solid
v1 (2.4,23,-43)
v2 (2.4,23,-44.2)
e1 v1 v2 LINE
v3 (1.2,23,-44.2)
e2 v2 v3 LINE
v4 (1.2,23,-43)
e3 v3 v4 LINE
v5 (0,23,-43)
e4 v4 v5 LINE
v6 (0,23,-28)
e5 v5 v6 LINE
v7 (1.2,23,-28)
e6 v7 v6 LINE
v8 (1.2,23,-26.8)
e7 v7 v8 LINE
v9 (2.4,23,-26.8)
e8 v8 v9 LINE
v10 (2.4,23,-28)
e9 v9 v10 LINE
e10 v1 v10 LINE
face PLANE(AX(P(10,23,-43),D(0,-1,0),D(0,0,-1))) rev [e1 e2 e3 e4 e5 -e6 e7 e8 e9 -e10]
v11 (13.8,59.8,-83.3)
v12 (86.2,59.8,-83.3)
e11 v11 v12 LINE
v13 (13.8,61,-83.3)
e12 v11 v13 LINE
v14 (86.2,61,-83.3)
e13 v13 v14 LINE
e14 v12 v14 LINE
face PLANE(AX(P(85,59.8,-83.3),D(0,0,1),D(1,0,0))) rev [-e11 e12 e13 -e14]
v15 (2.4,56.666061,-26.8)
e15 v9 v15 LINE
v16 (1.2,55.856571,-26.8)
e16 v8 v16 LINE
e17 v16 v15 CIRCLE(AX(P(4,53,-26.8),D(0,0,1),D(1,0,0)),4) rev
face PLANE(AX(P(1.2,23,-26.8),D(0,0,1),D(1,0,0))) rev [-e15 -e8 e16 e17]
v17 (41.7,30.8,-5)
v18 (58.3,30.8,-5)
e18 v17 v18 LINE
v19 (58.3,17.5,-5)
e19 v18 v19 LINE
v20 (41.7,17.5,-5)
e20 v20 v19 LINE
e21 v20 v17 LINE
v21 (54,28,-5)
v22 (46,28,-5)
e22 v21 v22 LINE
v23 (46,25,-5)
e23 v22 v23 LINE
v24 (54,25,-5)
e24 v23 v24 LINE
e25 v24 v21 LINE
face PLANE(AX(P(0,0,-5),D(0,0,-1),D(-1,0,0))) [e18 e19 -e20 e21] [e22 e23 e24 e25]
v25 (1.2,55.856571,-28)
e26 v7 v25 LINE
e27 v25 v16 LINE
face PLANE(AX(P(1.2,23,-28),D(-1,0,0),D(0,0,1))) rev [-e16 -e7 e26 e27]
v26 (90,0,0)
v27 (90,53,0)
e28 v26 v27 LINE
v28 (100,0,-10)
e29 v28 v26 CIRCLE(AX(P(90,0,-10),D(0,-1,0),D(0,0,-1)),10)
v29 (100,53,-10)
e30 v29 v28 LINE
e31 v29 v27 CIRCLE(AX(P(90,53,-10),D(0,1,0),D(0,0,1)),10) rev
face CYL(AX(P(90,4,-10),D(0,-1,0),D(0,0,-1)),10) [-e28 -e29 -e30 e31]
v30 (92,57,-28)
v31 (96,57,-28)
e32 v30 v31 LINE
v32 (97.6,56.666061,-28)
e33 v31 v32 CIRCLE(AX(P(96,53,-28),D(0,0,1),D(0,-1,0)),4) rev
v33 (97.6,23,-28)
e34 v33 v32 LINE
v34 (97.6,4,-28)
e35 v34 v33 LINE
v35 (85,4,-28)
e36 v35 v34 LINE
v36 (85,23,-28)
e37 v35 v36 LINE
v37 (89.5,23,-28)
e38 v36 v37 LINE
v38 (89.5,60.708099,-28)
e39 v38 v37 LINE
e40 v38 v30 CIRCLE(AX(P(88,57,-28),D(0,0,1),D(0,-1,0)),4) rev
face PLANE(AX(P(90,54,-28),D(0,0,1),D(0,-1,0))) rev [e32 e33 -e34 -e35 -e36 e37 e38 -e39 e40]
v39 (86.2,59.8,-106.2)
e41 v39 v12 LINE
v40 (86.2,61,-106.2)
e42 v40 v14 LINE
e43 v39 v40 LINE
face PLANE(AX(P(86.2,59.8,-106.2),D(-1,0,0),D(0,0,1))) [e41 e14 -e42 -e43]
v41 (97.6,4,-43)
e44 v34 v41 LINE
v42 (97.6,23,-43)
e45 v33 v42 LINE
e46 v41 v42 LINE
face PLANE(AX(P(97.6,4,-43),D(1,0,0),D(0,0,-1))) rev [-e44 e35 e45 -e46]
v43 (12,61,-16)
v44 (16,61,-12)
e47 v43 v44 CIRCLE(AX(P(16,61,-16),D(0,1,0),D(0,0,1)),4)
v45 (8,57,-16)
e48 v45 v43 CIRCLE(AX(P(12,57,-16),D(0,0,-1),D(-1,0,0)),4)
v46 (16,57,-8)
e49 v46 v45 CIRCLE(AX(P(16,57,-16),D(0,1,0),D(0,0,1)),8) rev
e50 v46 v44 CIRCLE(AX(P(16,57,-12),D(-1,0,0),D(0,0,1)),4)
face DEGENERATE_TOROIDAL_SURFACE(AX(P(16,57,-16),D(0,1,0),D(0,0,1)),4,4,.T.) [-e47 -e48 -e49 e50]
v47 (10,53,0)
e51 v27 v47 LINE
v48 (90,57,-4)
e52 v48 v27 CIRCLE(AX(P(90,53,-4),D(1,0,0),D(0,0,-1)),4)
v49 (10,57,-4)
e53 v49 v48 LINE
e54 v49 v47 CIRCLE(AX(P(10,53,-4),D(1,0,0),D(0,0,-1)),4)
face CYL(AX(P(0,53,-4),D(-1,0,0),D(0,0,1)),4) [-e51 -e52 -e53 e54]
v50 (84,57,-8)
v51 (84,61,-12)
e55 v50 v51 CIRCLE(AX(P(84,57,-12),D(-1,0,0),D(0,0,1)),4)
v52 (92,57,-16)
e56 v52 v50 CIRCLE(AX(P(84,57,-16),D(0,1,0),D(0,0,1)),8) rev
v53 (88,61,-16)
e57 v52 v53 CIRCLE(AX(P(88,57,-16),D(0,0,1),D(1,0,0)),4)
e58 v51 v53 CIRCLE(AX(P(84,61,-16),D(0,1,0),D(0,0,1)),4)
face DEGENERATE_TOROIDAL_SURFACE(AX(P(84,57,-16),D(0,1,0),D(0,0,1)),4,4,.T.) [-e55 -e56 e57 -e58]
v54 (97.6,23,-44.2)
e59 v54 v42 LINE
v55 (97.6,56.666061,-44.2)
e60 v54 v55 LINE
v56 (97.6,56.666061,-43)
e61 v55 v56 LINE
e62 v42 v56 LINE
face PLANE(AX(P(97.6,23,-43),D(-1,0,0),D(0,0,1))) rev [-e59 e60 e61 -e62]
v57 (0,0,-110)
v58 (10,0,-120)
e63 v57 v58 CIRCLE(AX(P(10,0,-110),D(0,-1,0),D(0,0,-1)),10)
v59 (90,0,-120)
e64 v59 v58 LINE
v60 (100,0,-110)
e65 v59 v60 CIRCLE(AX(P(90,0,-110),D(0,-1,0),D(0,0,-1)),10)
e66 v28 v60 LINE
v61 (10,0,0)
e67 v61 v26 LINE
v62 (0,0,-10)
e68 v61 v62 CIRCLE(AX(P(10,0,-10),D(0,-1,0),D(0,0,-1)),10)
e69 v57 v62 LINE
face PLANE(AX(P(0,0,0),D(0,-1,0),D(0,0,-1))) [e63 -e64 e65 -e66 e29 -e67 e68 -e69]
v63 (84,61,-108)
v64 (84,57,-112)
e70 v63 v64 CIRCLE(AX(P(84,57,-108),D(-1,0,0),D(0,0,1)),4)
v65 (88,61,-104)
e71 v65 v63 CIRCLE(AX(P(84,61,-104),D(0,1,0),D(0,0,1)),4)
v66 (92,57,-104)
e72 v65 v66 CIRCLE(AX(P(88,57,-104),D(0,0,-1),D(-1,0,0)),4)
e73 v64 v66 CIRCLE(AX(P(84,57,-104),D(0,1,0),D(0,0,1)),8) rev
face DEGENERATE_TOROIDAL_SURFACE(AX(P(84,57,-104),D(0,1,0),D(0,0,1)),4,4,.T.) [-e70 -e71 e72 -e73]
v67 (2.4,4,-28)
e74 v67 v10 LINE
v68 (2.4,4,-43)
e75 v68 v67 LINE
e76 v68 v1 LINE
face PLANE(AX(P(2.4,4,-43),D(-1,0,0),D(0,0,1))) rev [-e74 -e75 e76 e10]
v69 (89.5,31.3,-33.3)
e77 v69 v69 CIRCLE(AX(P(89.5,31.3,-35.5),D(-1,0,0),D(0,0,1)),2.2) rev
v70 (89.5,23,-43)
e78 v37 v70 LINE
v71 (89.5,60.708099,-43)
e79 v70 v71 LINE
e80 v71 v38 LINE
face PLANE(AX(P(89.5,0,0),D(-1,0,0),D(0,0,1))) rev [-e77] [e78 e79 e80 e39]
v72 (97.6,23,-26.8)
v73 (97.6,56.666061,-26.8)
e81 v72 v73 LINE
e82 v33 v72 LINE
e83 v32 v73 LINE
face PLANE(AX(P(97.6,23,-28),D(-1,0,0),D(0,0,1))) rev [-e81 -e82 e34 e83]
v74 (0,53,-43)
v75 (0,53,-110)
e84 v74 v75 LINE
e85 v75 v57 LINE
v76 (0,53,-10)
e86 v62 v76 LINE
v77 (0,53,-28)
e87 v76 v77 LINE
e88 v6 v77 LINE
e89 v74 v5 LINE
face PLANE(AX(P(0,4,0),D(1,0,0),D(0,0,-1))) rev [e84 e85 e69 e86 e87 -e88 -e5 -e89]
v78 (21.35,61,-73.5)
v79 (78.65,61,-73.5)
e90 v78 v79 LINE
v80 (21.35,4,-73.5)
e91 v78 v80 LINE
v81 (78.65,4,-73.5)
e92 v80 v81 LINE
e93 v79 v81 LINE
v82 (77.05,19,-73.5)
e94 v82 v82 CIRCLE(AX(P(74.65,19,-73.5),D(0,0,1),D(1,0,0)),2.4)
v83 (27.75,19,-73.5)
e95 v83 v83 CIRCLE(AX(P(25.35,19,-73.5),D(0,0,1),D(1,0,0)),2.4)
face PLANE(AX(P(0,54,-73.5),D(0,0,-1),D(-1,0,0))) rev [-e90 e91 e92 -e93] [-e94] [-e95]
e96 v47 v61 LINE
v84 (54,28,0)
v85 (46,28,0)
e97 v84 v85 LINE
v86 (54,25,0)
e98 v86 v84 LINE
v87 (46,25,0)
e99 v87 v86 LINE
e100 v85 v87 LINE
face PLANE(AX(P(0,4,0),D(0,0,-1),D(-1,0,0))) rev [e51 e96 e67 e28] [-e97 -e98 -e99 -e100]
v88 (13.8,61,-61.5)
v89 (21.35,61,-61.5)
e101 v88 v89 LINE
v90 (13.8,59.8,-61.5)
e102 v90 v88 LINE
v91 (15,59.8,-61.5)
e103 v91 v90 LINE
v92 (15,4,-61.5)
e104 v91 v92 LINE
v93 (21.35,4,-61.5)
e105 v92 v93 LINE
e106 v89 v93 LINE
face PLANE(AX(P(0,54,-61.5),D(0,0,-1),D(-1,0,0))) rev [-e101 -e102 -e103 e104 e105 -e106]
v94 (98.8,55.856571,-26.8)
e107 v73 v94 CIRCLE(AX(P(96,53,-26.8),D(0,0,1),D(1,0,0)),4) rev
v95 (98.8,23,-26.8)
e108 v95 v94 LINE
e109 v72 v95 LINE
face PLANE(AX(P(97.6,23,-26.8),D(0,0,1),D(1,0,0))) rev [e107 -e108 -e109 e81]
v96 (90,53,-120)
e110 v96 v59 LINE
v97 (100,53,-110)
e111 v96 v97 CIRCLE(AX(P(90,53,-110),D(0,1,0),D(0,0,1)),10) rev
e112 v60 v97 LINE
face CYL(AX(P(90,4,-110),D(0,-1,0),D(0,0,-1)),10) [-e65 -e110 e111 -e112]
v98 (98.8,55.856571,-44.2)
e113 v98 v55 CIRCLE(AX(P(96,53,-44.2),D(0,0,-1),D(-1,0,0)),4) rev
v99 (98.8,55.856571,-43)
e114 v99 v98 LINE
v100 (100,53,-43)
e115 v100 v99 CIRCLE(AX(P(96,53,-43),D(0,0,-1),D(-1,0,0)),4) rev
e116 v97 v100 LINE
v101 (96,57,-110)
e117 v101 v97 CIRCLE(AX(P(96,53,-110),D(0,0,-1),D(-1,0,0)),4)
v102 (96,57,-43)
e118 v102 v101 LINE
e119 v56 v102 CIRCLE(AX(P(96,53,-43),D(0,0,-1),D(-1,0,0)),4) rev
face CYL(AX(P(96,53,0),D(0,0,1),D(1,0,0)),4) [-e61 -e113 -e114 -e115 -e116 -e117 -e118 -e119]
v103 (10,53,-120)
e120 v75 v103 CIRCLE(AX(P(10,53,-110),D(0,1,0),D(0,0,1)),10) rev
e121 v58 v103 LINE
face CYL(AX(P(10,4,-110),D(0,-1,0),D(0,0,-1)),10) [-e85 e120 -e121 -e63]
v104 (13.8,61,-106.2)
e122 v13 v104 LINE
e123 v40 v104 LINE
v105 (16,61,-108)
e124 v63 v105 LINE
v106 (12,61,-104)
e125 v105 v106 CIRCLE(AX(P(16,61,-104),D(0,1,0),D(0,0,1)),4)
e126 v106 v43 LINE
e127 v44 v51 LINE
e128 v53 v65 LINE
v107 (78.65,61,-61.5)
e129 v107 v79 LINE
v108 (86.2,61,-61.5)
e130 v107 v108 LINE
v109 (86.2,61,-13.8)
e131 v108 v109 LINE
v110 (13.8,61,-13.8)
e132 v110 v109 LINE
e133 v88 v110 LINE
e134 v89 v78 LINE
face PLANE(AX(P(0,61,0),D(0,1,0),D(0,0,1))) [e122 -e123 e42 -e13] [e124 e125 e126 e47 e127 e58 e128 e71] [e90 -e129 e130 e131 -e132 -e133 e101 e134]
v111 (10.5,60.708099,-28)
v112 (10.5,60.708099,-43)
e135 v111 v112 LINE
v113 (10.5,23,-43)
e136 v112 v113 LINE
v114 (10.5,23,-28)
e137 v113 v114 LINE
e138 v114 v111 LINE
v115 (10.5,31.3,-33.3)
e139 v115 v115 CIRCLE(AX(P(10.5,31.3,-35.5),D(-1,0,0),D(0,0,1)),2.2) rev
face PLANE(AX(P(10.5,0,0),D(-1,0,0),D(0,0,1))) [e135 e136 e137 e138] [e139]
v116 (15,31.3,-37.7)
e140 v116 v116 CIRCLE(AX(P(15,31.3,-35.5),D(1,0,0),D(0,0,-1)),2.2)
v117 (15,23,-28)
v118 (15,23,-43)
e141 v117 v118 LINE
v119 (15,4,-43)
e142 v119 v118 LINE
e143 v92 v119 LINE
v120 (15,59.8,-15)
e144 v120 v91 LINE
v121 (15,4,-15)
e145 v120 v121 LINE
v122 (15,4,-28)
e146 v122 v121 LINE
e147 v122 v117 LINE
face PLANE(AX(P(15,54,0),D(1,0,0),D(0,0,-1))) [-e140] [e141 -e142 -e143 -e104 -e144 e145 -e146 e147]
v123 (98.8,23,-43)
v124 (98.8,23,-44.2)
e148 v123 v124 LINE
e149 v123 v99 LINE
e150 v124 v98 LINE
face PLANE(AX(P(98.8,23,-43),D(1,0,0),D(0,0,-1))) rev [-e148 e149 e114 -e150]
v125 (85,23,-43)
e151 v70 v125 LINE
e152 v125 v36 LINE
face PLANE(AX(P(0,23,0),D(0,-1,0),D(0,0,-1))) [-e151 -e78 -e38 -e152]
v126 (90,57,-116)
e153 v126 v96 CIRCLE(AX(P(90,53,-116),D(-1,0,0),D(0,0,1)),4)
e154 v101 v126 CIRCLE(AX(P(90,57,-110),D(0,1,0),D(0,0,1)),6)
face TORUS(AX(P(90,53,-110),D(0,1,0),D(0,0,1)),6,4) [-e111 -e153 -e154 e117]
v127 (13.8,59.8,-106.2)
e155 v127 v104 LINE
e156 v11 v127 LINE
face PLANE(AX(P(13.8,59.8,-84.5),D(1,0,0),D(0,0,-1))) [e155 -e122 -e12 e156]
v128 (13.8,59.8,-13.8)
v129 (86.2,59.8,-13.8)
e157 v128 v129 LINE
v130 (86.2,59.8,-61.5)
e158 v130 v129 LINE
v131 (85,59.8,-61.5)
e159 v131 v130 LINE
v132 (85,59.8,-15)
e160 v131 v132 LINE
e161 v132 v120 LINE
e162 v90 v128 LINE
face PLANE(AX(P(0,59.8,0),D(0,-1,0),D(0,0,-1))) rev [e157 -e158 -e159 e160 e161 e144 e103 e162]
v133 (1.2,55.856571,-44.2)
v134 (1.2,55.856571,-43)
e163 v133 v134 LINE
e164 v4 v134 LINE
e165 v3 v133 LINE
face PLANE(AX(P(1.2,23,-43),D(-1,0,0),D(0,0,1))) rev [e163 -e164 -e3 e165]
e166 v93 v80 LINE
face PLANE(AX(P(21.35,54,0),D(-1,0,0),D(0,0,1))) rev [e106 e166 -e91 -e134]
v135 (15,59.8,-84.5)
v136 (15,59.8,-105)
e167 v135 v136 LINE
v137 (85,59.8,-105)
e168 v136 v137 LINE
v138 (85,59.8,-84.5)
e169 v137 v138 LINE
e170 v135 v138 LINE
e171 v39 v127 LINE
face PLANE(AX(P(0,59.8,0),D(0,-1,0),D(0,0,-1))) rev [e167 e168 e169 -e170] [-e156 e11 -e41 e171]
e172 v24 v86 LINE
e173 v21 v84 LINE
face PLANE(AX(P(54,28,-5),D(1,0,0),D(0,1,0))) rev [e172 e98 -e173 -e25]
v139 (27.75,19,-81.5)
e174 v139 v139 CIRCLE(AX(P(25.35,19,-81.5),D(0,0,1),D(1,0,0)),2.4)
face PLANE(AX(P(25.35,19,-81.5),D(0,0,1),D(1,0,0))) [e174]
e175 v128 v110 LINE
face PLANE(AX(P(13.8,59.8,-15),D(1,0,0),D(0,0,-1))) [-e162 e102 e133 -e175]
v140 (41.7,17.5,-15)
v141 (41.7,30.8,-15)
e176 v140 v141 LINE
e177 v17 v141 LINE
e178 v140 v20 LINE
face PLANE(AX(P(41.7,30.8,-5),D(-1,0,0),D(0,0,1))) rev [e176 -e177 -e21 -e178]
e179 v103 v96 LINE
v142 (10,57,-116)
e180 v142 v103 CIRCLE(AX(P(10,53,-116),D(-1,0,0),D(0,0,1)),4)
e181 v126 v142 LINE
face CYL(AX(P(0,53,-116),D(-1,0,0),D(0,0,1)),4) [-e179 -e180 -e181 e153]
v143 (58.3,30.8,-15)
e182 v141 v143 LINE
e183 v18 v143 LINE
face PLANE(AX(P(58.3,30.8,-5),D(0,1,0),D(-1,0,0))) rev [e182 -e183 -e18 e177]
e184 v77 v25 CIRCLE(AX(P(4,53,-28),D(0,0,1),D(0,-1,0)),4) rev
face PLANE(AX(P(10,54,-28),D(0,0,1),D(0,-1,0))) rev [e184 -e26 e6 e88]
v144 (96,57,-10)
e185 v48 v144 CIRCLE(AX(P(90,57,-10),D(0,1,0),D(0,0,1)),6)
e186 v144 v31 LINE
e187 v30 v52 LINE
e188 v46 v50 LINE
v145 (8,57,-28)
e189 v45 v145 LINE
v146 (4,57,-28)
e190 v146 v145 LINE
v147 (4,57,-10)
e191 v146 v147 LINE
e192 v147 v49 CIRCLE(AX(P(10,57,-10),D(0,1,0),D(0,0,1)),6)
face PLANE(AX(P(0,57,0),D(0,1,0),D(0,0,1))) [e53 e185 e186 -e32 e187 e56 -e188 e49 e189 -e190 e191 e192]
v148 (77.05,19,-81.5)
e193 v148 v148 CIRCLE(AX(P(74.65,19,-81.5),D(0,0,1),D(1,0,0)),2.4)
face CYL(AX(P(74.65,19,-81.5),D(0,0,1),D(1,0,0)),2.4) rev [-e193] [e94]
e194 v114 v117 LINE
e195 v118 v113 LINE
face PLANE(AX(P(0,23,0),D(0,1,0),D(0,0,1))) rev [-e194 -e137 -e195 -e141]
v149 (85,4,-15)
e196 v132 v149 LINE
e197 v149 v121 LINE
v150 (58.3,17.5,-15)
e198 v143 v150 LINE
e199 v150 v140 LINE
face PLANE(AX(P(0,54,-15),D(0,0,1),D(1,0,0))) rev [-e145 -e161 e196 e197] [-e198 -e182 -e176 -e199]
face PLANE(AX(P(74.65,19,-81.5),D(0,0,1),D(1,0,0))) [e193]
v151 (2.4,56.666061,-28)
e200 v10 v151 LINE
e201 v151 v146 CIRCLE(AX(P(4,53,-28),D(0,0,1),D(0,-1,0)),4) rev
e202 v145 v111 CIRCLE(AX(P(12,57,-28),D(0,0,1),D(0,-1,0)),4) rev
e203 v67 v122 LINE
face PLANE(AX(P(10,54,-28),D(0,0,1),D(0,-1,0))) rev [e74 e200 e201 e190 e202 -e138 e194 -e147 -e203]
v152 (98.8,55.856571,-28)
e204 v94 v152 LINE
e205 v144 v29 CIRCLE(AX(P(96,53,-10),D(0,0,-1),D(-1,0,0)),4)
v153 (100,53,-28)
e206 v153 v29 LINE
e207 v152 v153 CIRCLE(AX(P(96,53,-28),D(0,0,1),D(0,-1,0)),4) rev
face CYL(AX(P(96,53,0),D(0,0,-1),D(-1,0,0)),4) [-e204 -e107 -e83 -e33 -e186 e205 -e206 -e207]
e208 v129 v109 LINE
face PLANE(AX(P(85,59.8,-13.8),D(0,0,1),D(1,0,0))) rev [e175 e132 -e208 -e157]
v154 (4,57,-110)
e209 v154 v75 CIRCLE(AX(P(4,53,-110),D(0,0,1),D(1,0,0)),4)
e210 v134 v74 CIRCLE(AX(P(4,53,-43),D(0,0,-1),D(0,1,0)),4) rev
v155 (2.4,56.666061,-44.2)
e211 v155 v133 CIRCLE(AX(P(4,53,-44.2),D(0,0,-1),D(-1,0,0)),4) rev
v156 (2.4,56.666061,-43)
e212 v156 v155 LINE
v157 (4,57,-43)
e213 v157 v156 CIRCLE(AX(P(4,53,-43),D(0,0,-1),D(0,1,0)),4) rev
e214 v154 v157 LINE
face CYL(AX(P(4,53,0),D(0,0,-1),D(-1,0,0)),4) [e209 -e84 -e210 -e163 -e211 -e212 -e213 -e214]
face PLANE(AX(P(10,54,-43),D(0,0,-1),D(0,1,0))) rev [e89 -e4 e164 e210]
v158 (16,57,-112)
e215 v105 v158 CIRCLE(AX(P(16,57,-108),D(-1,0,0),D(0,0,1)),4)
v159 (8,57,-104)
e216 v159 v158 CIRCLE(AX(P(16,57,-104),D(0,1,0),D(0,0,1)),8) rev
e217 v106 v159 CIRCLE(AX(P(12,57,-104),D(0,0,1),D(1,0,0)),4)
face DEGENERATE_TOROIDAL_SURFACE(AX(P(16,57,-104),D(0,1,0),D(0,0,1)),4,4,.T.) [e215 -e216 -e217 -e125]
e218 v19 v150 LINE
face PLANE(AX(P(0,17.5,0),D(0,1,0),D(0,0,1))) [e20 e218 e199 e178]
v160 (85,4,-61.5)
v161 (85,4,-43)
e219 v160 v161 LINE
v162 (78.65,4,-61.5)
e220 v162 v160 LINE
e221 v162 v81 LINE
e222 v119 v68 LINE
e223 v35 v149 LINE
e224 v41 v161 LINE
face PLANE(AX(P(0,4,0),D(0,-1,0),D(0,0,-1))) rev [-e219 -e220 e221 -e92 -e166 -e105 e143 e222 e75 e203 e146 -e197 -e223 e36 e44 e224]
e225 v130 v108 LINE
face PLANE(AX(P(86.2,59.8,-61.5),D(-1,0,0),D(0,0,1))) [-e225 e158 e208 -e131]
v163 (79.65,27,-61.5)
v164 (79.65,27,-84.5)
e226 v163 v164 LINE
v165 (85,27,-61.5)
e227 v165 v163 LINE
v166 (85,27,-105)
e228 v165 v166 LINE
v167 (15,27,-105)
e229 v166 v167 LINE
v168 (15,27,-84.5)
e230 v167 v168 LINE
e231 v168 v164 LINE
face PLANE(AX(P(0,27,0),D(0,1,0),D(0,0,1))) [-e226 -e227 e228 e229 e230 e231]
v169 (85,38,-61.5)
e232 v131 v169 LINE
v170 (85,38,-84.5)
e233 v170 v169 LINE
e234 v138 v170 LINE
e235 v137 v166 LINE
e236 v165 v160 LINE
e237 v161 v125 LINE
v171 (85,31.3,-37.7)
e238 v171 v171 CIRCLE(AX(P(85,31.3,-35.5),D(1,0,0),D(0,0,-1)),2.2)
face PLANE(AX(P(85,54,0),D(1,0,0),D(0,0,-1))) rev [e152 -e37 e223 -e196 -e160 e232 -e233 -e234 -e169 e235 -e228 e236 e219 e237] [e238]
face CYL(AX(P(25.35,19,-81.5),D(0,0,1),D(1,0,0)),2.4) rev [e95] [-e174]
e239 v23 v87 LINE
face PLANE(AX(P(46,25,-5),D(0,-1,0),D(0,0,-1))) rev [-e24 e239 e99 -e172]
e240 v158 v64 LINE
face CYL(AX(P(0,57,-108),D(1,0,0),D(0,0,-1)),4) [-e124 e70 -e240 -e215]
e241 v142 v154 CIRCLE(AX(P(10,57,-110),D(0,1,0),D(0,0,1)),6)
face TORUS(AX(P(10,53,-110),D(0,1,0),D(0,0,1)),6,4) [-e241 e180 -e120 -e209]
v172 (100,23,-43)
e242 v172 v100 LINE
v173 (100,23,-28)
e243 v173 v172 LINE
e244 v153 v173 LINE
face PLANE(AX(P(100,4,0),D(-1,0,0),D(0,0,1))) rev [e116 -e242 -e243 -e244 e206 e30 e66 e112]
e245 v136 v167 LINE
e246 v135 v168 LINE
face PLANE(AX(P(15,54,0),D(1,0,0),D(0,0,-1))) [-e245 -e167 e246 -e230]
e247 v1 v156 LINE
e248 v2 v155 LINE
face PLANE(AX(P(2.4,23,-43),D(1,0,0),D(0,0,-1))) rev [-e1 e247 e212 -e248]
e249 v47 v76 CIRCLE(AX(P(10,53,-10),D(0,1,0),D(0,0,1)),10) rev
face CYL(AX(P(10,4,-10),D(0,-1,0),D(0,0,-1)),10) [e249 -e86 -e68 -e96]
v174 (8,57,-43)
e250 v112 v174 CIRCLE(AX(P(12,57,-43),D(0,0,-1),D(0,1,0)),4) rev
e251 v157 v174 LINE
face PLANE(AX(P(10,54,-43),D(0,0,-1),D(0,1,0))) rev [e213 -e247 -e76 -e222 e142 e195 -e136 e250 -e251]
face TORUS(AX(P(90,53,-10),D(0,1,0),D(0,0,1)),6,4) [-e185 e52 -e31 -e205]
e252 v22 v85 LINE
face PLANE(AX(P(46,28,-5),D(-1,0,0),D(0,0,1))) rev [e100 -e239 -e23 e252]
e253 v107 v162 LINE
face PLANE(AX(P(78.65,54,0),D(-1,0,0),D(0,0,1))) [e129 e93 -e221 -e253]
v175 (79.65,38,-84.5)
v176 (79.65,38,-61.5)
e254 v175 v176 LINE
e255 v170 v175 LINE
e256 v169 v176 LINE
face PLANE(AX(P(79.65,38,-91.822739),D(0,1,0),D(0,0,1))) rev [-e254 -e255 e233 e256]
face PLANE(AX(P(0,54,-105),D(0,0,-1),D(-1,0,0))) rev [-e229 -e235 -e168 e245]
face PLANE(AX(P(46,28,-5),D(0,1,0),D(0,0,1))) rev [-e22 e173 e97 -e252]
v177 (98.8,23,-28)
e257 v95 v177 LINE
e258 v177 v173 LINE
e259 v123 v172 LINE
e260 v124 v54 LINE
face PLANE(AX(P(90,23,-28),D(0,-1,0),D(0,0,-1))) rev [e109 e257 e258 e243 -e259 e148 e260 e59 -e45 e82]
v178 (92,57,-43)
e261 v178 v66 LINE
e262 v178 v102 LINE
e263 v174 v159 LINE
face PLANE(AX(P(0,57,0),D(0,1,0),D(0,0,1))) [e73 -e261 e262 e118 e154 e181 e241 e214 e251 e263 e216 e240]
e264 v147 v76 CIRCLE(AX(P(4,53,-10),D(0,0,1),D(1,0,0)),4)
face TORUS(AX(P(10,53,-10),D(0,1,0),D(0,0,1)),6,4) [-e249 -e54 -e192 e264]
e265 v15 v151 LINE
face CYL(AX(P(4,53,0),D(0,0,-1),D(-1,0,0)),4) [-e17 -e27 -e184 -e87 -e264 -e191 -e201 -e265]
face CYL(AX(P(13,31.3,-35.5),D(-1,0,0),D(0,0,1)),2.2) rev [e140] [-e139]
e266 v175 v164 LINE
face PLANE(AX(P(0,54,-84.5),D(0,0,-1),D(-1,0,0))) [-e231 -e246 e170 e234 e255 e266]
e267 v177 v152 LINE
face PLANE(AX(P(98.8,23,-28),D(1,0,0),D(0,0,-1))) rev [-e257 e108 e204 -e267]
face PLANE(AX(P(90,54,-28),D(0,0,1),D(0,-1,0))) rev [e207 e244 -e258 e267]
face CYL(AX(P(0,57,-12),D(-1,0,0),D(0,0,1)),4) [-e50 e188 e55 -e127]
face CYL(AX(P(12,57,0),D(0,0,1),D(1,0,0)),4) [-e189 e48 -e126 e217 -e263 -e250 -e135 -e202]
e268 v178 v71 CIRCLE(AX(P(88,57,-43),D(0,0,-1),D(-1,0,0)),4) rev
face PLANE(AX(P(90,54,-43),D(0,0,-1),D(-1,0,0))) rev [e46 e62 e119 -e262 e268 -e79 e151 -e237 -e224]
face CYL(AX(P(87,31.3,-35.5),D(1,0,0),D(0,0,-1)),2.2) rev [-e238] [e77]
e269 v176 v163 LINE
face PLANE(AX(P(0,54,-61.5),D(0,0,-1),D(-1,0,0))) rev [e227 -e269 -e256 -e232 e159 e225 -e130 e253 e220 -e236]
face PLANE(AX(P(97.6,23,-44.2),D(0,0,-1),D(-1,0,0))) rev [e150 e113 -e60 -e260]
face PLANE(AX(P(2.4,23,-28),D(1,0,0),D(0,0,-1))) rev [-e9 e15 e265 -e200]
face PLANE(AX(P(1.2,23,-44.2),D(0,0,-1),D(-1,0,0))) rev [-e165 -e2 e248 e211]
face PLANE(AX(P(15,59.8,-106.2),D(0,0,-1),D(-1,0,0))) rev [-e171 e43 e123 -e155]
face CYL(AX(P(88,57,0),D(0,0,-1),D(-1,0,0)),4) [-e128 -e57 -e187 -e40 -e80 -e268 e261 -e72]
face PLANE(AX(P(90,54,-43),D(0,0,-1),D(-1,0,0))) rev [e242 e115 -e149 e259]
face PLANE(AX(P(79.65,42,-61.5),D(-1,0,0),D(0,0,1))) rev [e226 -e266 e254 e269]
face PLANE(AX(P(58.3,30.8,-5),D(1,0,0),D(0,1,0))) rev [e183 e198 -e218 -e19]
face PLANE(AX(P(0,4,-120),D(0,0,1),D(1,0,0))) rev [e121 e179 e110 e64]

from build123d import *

# Parameters (mm, degrees)
SKICA2_W                  = 100
SKICA2_H                  = 120
P_IDAT_VYSUNUT_M1_DEPTH   = 4
SKICA3_W                  = 15
SKICA3_H                  = 15
SKICA3_W_2                = 70
SKICA3_W_3                = 57.3
SKICA3_H_2                = 3
P_IDAT_VYSUNUT_M2_DEPTH   = 50
SKICA4_W                  = 70
SKICA4_H                  = 20.5
P_IDAT_VYSUNUT_M3_DEPTH   = 23
SKICA8_W                  = 6.35
SKICA8_H                  = 6
ODEBRAT_VYSUNUT_M1_DEPTH  = 23
SKICA9_W                  = 6.35
SKICA9_H                  = 2
P_IDAT_VYSUNUT_M5_DEPTH   = 6
SKICA10_R                 = 2.4
ODEBRAT_VYSUNUT_M2_DEPTH  = 8
SKICA11_W                 = 16.6
SKICA11_H                 = 11.8
ODEBRAT_VYSUNUT_M5_DEPTH  = 10
SKICA14_W                 = 8
SKICA14_H                 = 3
ODEBRAT_VYSUNUT_M6_DEPTH  = 5
SKICA15_W                 = 100
SKICA15_H                 = 120
SKICA15_W_2               = 84
SKICA15_H_2               = 104
ODEBRAT_VYSUNUT_M7_DEPTH  = 4
SKICA20_W                 = 15
SKICA20_H                 = 31
ODEBRAT_VYSUNUT_M8_DEPTH  = 10
SKICA21_W                 = 15
SKICA21_H                 = 31
ODEBRAT_VYSUNUT_M10_DEPTH = 10
SKICA22_R                 = 2.2
ODEBRAT_VYSUNUT_M11_DEPTH = 3
ODEBRAT_START             = -3
SKICA23_R                 = 2.2
ODEBRAT_VYSUNUT_M12_DEPTH = 3
SKICA24_W                 = 1.2
SKICA24_H                 = 1.2
ODEBRAT_VYSUNUT_M14_DEPTH = 27
SKICA26_W                 = 12.6
SKICA26_H                 = 15
ODEBRAT_VYSUNUT_M16_DEPTH = 19
SKICA32_R                 = 2.2
ODEBRAT_VYSUNUT_M19_DEPTH = 158.749801902
SKICA33_W                 = 2
SKICA33_H                 = 6
ODEBRAT_VYSUNUT_M20_DEPTH = 6.35
SKICA35_W                 = 16.6
SKICA35_H                 = 10
ODEBRAT_VYSUNUT_M21_DEPTH = 1.5
SKICA38_W                 = 1
SKICA38_H                 = 23
P_IDAT_VYSUNUT_M9_DEPTH   = 15
SKICA39_W                 = 5.35
SKICA39_H                 = 5
ODEBRAT_VYSUNUT_M23_DEPTH = 23
SKICA40_W                 = 15
SKICA40_H                 = 31
ODEBRAT_VYSUNUT_M24_DEPTH = 0.5
SKICA41_W                 = 15
SKICA41_H                 = 31
ODEBRAT_VYSUNUT_M25_DEPTH = 0.5
SKICA43_W                 = 70
SKICA43_H                 = 20.5
P_IDAT_VYSUNUT_M10_DEPTH  = 7
P_IDAT_VYSUNUT_M11_DEPTH  = 7
SKICA45_W                 = 70
SKICA45_H                 = 1.2
SKICA45_H_2               = 20.5
SKICA45_W_2               = 1.2
SKICA45_H_3               = 46.5
ODEBRAT_VYSUNUT_M26_DEPTH = 1.2
ZAOBLIT1_R                = 10
ZAOBLIT2_R                = 8
ZAOBLIT3_R                = 4


with BuildPart() as part:
    # Skica2 → Přidat vysunutím1 (new body)
    with BuildSketch(Plane(origin=(0, 0, 0), x_dir=(1, 0, 0), z_dir=(0, 1, 0))):
        with Locations((50, 60)):
            Rectangle(SKICA2_W, SKICA2_H)
    extrude(amount=P_IDAT_VYSUNUT_M1_DEPTH)

    # Skica3 → Přidat vysunutím2 (add)
    with BuildSketch(Plane(origin=(0, 4, 0), x_dir=(1, 0, 0), z_dir=(0, 1, 0))):
        with Locations((7.5, 112.5)):
            Rectangle(SKICA3_W, SKICA3_H)
        with Locations((50, 112.5)):
            Rectangle(SKICA3_W_2, SKICA3_H)
        Polygon((15, 105), (0, 105), (0, 15), (15, 15), (15, 61.5), (15, 76.5), (15, 84.5), align=None)
        with Locations((92.5, 112.5)):
            Rectangle(SKICA3_W, SKICA3_H)
        Polygon((100, 105), (85, 105), (85, 84.5), (85, 76.5), (85, 61.5), (85, 15), (100, 15), align=None)
        Polygon((85, 84.5), (15, 84.5), (15, 76.5), (21.35, 76.5), (78.65, 76.5), (85, 76.5), align=None)
        with Locations((7.5, 7.5)):
            Rectangle(SKICA3_W, SKICA3_H)
        with Locations((50, 7.5)):
            Rectangle(SKICA3_W_2, SKICA3_H)
        with Locations((92.5, 7.5)):
            Rectangle(SKICA3_W, SKICA3_H)
        Polygon((21.35, 76.5), (15, 76.5), (15, 61.5), (21.35, 61.5), (21.35, 73.5), align=None)
        with Locations((50, 75)):
            Rectangle(SKICA3_W_3, SKICA3_H_2)
        Polygon((85, 61.5), (85, 76.5), (78.65, 76.5), (78.65, 73.5), (78.65, 61.5), align=None)
    extrude(amount=P_IDAT_VYSUNUT_M2_DEPTH)

    # Skica4 → Přidat vysunutím3 (add)
    with BuildSketch(Plane(origin=(0, 4, 0), x_dir=(1, 0, 0), z_dir=(0, 1, 0))):
        with Locations((50, 94.75)):
            Rectangle(SKICA4_W, SKICA4_H)
    extrude(amount=P_IDAT_VYSUNUT_M3_DEPTH)

    # Skica8 → Odebrat vysunutím1 (cut)
    with BuildSketch(Plane.XY.offset(-61.5)):
        with Locations((81.825, 30)):
            Rectangle(SKICA8_W, SKICA8_H)
    extrude(amount=-ODEBRAT_VYSUNUT_M1_DEPTH, mode=Mode.SUBTRACT)

    # Skica9 → Přidat vysunutím5 (add)
    with BuildSketch(Plane(origin=(0, 27, 0), x_dir=(1, 0, 0), z_dir=(0, 1, 0))):
        with Locations((81.825, 62.5)):
            Rectangle(SKICA9_W, SKICA9_H)
    extrude(amount=P_IDAT_VYSUNUT_M5_DEPTH)

    # Skica10 → Odebrat vysunutím2 (cut)
    with BuildSketch(Plane.XY.offset(-73.5)):
        with Locations((25.35, 19)):
            Circle(SKICA10_R)
        with Locations((74.65, 19)):
            Circle(SKICA10_R)
    extrude(amount=-ODEBRAT_VYSUNUT_M2_DEPTH, mode=Mode.SUBTRACT)

    # Skica11 → Odebrat vysunutím5 (cut)
    with BuildSketch(Plane(origin=(0, 0, -15), x_dir=(-1, 0, 0), z_dir=(0, 0, -1))):
        with Locations((-50, 24.9)):
            Rectangle(SKICA11_W, SKICA11_H)
    extrude(amount=-ODEBRAT_VYSUNUT_M5_DEPTH, mode=Mode.SUBTRACT)

    # Skica14 → Odebrat vysunutím6 (cut)
    with BuildSketch(Plane.XY):
        with Locations((50, 26.5)):
            Rectangle(SKICA14_W, SKICA14_H)
    extrude(amount=-ODEBRAT_VYSUNUT_M6_DEPTH, mode=Mode.SUBTRACT)

    # Skica15 → Odebrat vysunutím7 (cut)
    with BuildSketch(Plane(origin=(0, 54, 0), x_dir=(1, 0, 0), z_dir=(0, 1, 0))):
        with Locations((50, 60)):
            Rectangle(SKICA15_W, SKICA15_H)
        with Locations((50, 60)):
            Rectangle(SKICA15_W_2, SKICA15_H_2, mode=Mode.SUBTRACT)
    extrude(amount=-ODEBRAT_VYSUNUT_M7_DEPTH, mode=Mode.SUBTRACT)

    # Skica20 → Odebrat vysunutím8 (cut)
    with BuildSketch(Plane.ZY):
        with Locations((-35.5, 38.5)):
            Rectangle(SKICA20_W, SKICA20_H)
    extrude(amount=-ODEBRAT_VYSUNUT_M8_DEPTH, mode=Mode.SUBTRACT)

    # Skica21 → Odebrat vysunutím10 (cut)
    with BuildSketch(Plane(origin=(100, 0, 0), x_dir=(0, 0, -1), z_dir=(1, 0, 0))):
        with Locations((35.5, 38.5)):
            Rectangle(SKICA21_W, SKICA21_H)
    extrude(amount=-ODEBRAT_VYSUNUT_M10_DEPTH, mode=Mode.SUBTRACT)

    # Skica22 → Odebrat vysunutím11 (cut)
    with BuildSketch(Plane.ZY.offset(-10)):
        with Locations((-35.5, 31.3)):
            Circle(SKICA22_R)
    extrude(amount=-ODEBRAT_VYSUNUT_M11_DEPTH, mode=Mode.SUBTRACT)

    # Skica23 → Odebrat vysunutím12 (cut)
    with BuildSketch(Plane(origin=(90, 0, 0), x_dir=(0, 0, -1), z_dir=(1, 0, 0)).offset(ODEBRAT_START)):
        with Locations(Location((35.5, 31.3, 0), (0, 0, 180))):
            Circle(SKICA23_R)
    extrude(amount=ODEBRAT_VYSUNUT_M12_DEPTH, mode=Mode.SUBTRACT)

    # Skica24 → Odebrat vysunutím14 (cut)
    with BuildSketch(Plane(origin=(0, 50, 0), x_dir=(1, 0, 0), z_dir=(0, 1, 0))):
        with Locations((1.8, 27.4)):
            Rectangle(SKICA24_W, SKICA24_H)
        with Locations((1.8, 43.6)):
            Rectangle(SKICA24_W, SKICA24_H)
        with Locations((98.2, 27.4)):
            Rectangle(SKICA24_W, SKICA24_H)
        with Locations((98.2, 43.6)):
            Rectangle(SKICA24_W, SKICA24_H)
    extrude(amount=-ODEBRAT_VYSUNUT_M14_DEPTH, mode=Mode.SUBTRACT)

    # Skica26 → Odebrat vysunutím16 (cut)
    with BuildSketch(Plane(origin=(0, 23, 0), x_dir=(1, 0, 0), z_dir=(0, 1, 0))):
        with Locations((8.7, 35.5)):
            Rectangle(SKICA26_W, SKICA26_H)
        with Locations((91.3, 35.5)):
            Rectangle(SKICA26_W, SKICA26_H)
    extrude(amount=-ODEBRAT_VYSUNUT_M16_DEPTH, mode=Mode.SUBTRACT)

    # Skica32 → Odebrat vysunutím19 (cut, through all)
    with BuildSketch(Plane.ZY.offset(-13)):
        with Locations((-35.5, 31.3)):
            Circle(SKICA32_R)
    extrude(amount=-ODEBRAT_VYSUNUT_M19_DEPTH, mode=Mode.SUBTRACT)

    # Skica33 → Odebrat vysunutím20 (cut)
    with BuildSketch(Plane.ZY.offset(-78.65)):
        with Locations((-62.5, 30)):
            Rectangle(SKICA33_W, SKICA33_H)
    extrude(amount=-ODEBRAT_VYSUNUT_M20_DEPTH, mode=Mode.SUBTRACT)

    # Skica35 → Odebrat vysunutím21 (cut)
    with BuildSketch(Plane(origin=(0, 19, 0), x_dir=(1, 0, 0), z_dir=(0, 1, 0))):
        with Locations((50, 10)):
            Rectangle(SKICA35_W, SKICA35_H)
    extrude(amount=-ODEBRAT_VYSUNUT_M21_DEPTH, mode=Mode.SUBTRACT)

    # Skica38 → Přidat vysunutím9 (add)
    with BuildSketch(Plane(origin=(0, 27, 0), x_dir=(1, 0, 0), z_dir=(0, 1, 0))):
        with Locations((79.15, 73)):
            Rectangle(SKICA38_W, SKICA38_H)
    extrude(amount=P_IDAT_VYSUNUT_M9_DEPTH)

    # Skica39 → Odebrat vysunutím23 (cut)
    with BuildSketch(Plane.XY.offset(-61.5)):
        with Locations((82.325, 35.5)):
            Rectangle(SKICA39_W, SKICA39_H)
    extrude(amount=-ODEBRAT_VYSUNUT_M23_DEPTH, mode=Mode.SUBTRACT)

    # Skica40 → Odebrat vysunutím24 (cut)
    with BuildSketch(Plane.ZY.offset(-10)):
        with Locations((-35.5, 38.5)):
            Rectangle(SKICA40_W, SKICA40_H)
    extrude(amount=-ODEBRAT_VYSUNUT_M24_DEPTH, mode=Mode.SUBTRACT)

    # Skica41 → Odebrat vysunutím25 (cut)
    with BuildSketch(Plane(origin=(90, 0, 0), x_dir=(0, 0, -1), z_dir=(1, 0, 0))):
        with Locations((35.5, 38.5)):
            Rectangle(SKICA41_W, SKICA41_H)
    extrude(amount=-ODEBRAT_VYSUNUT_M25_DEPTH, mode=Mode.SUBTRACT)

    # Skica43 → Přidat vysunutím10 (add)
    with BuildSketch(Plane(origin=(0, 54, 0), x_dir=(1, 0, 0), z_dir=(0, 1, 0))):
        Polygon((92, 8), (92, 28), (89.5, 28), (89.5, 43), (92, 43), (92, 112), (8, 112), (8, 43), (10.5, 43), (10.5, 28), (8, 28), (8, 8), align=None)
        with Locations((50, 94.75)):
            Rectangle(SKICA43_W, SKICA43_H, mode=Mode.SUBTRACT)
        Polygon((78.65, 73.5), (78.65, 61.5), (85, 61.5), (85, 15), (15, 15), (15, 61.5), (21.35, 61.5), (21.35, 73.5), align=None, mode=Mode.SUBTRACT)
    extrude(amount=P_IDAT_VYSUNUT_M10_DEPTH)

    # Skica44 → Přidat vysunutím11 (add)
    with BuildSketch(Plane(origin=(0, 50, 0), x_dir=(1, 0, 0), z_dir=(0, 1, 0))):
        Polygon((0, 120), (0, 43), (1.2, 43), (1.2, 44.2), (2.4, 44.2), (2.4, 43), (8, 43), (8, 112), (92, 112), (92, 43), (97.6, 43), (97.6, 44.2), (98.8, 44.2), (98.8, 43), (100, 43), (100, 120), align=None)
        Polygon((1.2, 28), (0, 28), (0, 0), (100, 0), (100, 28), (98.8, 28), (98.8, 26.8), (97.6, 26.8), (97.6, 28), (92, 28), (92, 8), (8, 8), (8, 28), (2.4, 28), (2.4, 26.8), (1.2, 26.8), align=None)
    extrude(amount=P_IDAT_VYSUNUT_M11_DEPTH)

    # Skica45 → Odebrat vysunutím26 (cut)
    with BuildSketch(Plane(origin=(0, 61, 0), x_dir=(1, 0, 0), z_dir=(0, 1, 0))):
        with Locations((50, 105.6)):
            Rectangle(SKICA45_W, SKICA45_H)
        Polygon((15, 84.5), (15, 105), (15, 106.2), (13.8, 106.2), (13.8, 84.5), align=None)
        with Locations((50, 94.75)):
            Rectangle(SKICA45_W, SKICA45_H_2)
        Polygon((85, 106.2), (85, 105), (85, 84.5), (85, 83.3), (86.2, 83.3), (86.2, 106.2), align=None)
        Polygon((85, 84.5), (15, 84.5), (13.8, 84.5), (13.8, 83.3), (85, 83.3), align=None)
        Polygon((85, 15), (15, 15), (13.8, 15), (13.8, 13.8), (85, 13.8), align=None)
        with Locations((14.4, 38.25)):
            Rectangle(SKICA45_W_2, SKICA45_H_3)
        Polygon((85, 61.5), (85, 15), (85, 13.8), (86.2, 13.8), (86.2, 61.5), align=None)
    extrude(amount=-ODEBRAT_VYSUNUT_M26_DEPTH, mode=Mode.SUBTRACT)

    # Zaoblit1
    zaoblit1_edges = [part.edges().sort_by_distance(p)[0] for p in [
        (0, 28.5, -120),
        (100, 28.5, -120),
        (100, 28.5, 0),
        (0, 28.5, 0),
    ]]
    fillet(zaoblit1_edges, radius=ZAOBLIT1_R)

    # Zaoblit2
    zaoblit2_edges = [part.edges().sort_by_distance(p)[0] for p in [
        (92, 59, -8),
        (8, 59, -8),
        (8, 59, -112),
        (92, 59, -112),
    ]]
    fillet(zaoblit2_edges, radius=ZAOBLIT2_R)

    # Zaoblit3
    # the kernel refuses this fillet: 4 mm, written as the material it takes off along each edge
    with BuildSketch(Plane(origin=(8, 61, -104), x_dir=(1, 0, 0), z_dir=(0, 0, 1)), Plane(origin=(92, 61, -33), x_dir=(-1, 0, 0), z_dir=(0, 0, -1))) as zaoblit3_piece_1:
        with BuildLine():
            CenterArc((ZAOBLIT3_R, -ZAOBLIT3_R), ZAOBLIT3_R, 90, 90)
            Line((0, -ZAOBLIT3_R), (0, 0))
            Line((0, 0), (ZAOBLIT3_R, 0))
        make_face()
    extrude(amount=71, mode=Mode.SUBTRACT)
    with BuildSketch(Plane(origin=(100, 57, -10), x_dir=(-1, 0, 0), z_dir=(0, 0, -1)), Plane(origin=(0, 57, -38), x_dir=(1, 0, 0), z_dir=(0, 0, 1))) as zaoblit3_piece_2:
        with BuildLine():
            CenterArc((ZAOBLIT3_R, -ZAOBLIT3_R), ZAOBLIT3_R, 90, 90)
            Line((0, -ZAOBLIT3_R), (0, 0))
            Line((0, 0), (ZAOBLIT3_R, 0))
        make_face()
    extrude(amount=28, mode=Mode.SUBTRACT)
    with BuildSketch(Plane(origin=(100, 57, -33), x_dir=(0, -1, 0), z_dir=(0, 0, -1)), Plane(origin=(0, 57, -110), x_dir=(0, -1, 0), z_dir=(0, 0, 1))) as zaoblit3_piece_3:
        with BuildLine():
            CenterArc((ZAOBLIT3_R, ZAOBLIT3_R), ZAOBLIT3_R, 180, 90)
            Line((0, ZAOBLIT3_R), (0, 0))
            Line((0, 0), (ZAOBLIT3_R, 0))
        make_face()
    extrude(amount=77, mode=Mode.SUBTRACT)
    with BuildSketch(Plane(origin=(10, 57, 0), x_dir=(0, 0, -1), z_dir=(1, 0, 0)), Plane(origin=(90, 57, -120), x_dir=(0, 0, 1), z_dir=(-1, 0, 0))) as zaoblit3_piece_4:
        with BuildLine():
            CenterArc((ZAOBLIT3_R, -ZAOBLIT3_R), ZAOBLIT3_R, 90, 90)
            Line((0, -ZAOBLIT3_R), (0, 0))
            Line((0, 0), (ZAOBLIT3_R, 0))
        make_face()
    extrude(amount=80, mode=Mode.SUBTRACT)
    with BuildSketch(Plane(origin=(10, 57, -10), x_dir=(0, 0, 1), z_dir=(1, 0, 0))) as zaoblit3_piece_5:
        with BuildLine():
            CenterArc((10 - ZAOBLIT3_R, ZAOBLIT3_R), ZAOBLIT3_R, 270, 90)
            Line((10, ZAOBLIT3_R), (10, 0))
            Line((10, 0), (10 - ZAOBLIT3_R, 0))
        make_face()
    revolve(axis=Axis((10, 57, -10), (0, -1, 0)), revolution_arc=90, mode=Mode.SUBTRACT)
    with BuildSketch(Plane(origin=(90, 57, -10), x_dir=(0, 0, 1), z_dir=(-1, 0, 0))) as zaoblit3_piece_6:
        with BuildLine():
            CenterArc((10 - ZAOBLIT3_R, -ZAOBLIT3_R), ZAOBLIT3_R, 0, 90)
            Line((10, -ZAOBLIT3_R), (10, 0))
            Line((10, 0), (10 - ZAOBLIT3_R, 0))
        make_face()
    revolve(axis=Axis((90, 57, -10), (0, 1, 0)), revolution_arc=90, mode=Mode.SUBTRACT)
    with BuildSketch(Plane(origin=(10, 57, -110), x_dir=(0, 0, -1), z_dir=(1, 0, 0))) as zaoblit3_piece_7:
        with BuildLine():
            CenterArc((10 - ZAOBLIT3_R, -ZAOBLIT3_R), ZAOBLIT3_R, 0, 90)
            Line((10, -ZAOBLIT3_R), (10, 0))
            Line((10, 0), (10 - ZAOBLIT3_R, 0))
        make_face()
    revolve(axis=Axis((10, 57, -110), (0, 1, 0)), revolution_arc=90, mode=Mode.SUBTRACT)
    with BuildSketch(Plane(origin=(90, 57, -110), x_dir=(0, 0, -1), z_dir=(-1, 0, 0))) as zaoblit3_piece_8:
        with BuildLine():
            CenterArc((10 - ZAOBLIT3_R, ZAOBLIT3_R), ZAOBLIT3_R, 270, 90)
            Line((10, ZAOBLIT3_R), (10, 0))
            Line((10, 0), (10 - ZAOBLIT3_R, 0))
        make_face()
    revolve(axis=Axis((90, 57, -110), (0, -1, 0)), revolution_arc=90, mode=Mode.SUBTRACT)
    with BuildSketch(Plane(origin=(16, 61, -8), x_dir=(0, -1, 0), z_dir=(1, 0, 0))) as zaoblit3_piece_9:
        with BuildLine():
            CenterArc((ZAOBLIT3_R, ZAOBLIT3_R), ZAOBLIT3_R, 180, 90)
            Line((0, ZAOBLIT3_R), (0, 0))
            Line((0, 0), (ZAOBLIT3_R, 0))
        make_face()
    extrude(amount=68, mode=Mode.SUBTRACT)
    with BuildSketch(Plane(origin=(84, 61, -112), x_dir=(0, 0, 1), z_dir=(-1, 0, 0))) as zaoblit3_piece_10:
        with BuildLine():
            CenterArc((ZAOBLIT3_R, -ZAOBLIT3_R), ZAOBLIT3_R, 90, 90)
            Line((0, -ZAOBLIT3_R), (0, 0))
            Line((0, 0), (ZAOBLIT3_R, 0))
        make_face()
    extrude(amount=68, mode=Mode.SUBTRACT)
    with BuildSketch(Plane(origin=(84, 61, -16), x_dir=(0, 0, 1), z_dir=(-1, 0, 0))) as zaoblit3_piece_11:
        with BuildLine():
            CenterArc((8 - ZAOBLIT3_R, -ZAOBLIT3_R), ZAOBLIT3_R, 0, 90)
            Line((8 - ZAOBLIT3_R, 0), (8, 0))
            Line((8, 0), (8, -ZAOBLIT3_R))
        make_face()
    revolve(axis=Axis((84, 61, -16), (0, 1, 0)), revolution_arc=90, mode=Mode.SUBTRACT)
    with BuildSketch(Plane(origin=(84, 61, -104), x_dir=(0, 0, -1), z_dir=(-1, 0, 0))) as zaoblit3_piece_12:
        with BuildLine():
            CenterArc((8 - ZAOBLIT3_R, ZAOBLIT3_R), ZAOBLIT3_R, 270, 90)
            Line((8, ZAOBLIT3_R), (8, 0))
            Line((8, 0), (8 - ZAOBLIT3_R, 0))
        make_face()
    revolve(axis=Axis((84, 61, -104), (0, -1, 0)), revolution_arc=90, mode=Mode.SUBTRACT)
    with BuildSketch(Plane(origin=(16, 61, -104), x_dir=(-1, 0, 0), z_dir=(0, 0, 1))) as zaoblit3_piece_13:
        with BuildLine():
            CenterArc((8 - ZAOBLIT3_R, ZAOBLIT3_R), ZAOBLIT3_R, 270, 90)
            Line((8, ZAOBLIT3_R), (8, 0))
            Line((8, 0), (8 - ZAOBLIT3_R, 0))
        make_face()
    revolve(axis=Axis((16, 61, -104), (0, -1, 0)), revolution_arc=90, mode=Mode.SUBTRACT)
    with BuildSketch(Plane(origin=(16, 61, -16), x_dir=(-1, 0, 0), z_dir=(0, 0, -1))) as zaoblit3_piece_14:
        with BuildLine():
            CenterArc((8 - ZAOBLIT3_R, -ZAOBLIT3_R), ZAOBLIT3_R, 0, 90)
            Line((8 - ZAOBLIT3_R, 0), (8, 0))
            Line((8, 0), (8, -ZAOBLIT3_R))
        make_face()
    revolve(axis=Axis((16, 61, -16), (0, 1, 0)), revolution_arc=90, mode=Mode.SUBTRACT)
    with BuildSketch(Plane(origin=(8, 61, -38), x_dir=(0, -1, 0), z_dir=(0, 0, 1)), Plane(origin=(92, 61, -16), x_dir=(0, -1, 0), z_dir=(0, 0, -1))) as zaoblit3_piece_15:
        with BuildLine():
            CenterArc((ZAOBLIT3_R, ZAOBLIT3_R), ZAOBLIT3_R, 180, 90)
            Line((0, ZAOBLIT3_R), (0, 0))
            Line((0, 0), (ZAOBLIT3_R, 0))
        make_face()
    extrude(amount=22, mode=Mode.SUBTRACT)


solid = part.part
